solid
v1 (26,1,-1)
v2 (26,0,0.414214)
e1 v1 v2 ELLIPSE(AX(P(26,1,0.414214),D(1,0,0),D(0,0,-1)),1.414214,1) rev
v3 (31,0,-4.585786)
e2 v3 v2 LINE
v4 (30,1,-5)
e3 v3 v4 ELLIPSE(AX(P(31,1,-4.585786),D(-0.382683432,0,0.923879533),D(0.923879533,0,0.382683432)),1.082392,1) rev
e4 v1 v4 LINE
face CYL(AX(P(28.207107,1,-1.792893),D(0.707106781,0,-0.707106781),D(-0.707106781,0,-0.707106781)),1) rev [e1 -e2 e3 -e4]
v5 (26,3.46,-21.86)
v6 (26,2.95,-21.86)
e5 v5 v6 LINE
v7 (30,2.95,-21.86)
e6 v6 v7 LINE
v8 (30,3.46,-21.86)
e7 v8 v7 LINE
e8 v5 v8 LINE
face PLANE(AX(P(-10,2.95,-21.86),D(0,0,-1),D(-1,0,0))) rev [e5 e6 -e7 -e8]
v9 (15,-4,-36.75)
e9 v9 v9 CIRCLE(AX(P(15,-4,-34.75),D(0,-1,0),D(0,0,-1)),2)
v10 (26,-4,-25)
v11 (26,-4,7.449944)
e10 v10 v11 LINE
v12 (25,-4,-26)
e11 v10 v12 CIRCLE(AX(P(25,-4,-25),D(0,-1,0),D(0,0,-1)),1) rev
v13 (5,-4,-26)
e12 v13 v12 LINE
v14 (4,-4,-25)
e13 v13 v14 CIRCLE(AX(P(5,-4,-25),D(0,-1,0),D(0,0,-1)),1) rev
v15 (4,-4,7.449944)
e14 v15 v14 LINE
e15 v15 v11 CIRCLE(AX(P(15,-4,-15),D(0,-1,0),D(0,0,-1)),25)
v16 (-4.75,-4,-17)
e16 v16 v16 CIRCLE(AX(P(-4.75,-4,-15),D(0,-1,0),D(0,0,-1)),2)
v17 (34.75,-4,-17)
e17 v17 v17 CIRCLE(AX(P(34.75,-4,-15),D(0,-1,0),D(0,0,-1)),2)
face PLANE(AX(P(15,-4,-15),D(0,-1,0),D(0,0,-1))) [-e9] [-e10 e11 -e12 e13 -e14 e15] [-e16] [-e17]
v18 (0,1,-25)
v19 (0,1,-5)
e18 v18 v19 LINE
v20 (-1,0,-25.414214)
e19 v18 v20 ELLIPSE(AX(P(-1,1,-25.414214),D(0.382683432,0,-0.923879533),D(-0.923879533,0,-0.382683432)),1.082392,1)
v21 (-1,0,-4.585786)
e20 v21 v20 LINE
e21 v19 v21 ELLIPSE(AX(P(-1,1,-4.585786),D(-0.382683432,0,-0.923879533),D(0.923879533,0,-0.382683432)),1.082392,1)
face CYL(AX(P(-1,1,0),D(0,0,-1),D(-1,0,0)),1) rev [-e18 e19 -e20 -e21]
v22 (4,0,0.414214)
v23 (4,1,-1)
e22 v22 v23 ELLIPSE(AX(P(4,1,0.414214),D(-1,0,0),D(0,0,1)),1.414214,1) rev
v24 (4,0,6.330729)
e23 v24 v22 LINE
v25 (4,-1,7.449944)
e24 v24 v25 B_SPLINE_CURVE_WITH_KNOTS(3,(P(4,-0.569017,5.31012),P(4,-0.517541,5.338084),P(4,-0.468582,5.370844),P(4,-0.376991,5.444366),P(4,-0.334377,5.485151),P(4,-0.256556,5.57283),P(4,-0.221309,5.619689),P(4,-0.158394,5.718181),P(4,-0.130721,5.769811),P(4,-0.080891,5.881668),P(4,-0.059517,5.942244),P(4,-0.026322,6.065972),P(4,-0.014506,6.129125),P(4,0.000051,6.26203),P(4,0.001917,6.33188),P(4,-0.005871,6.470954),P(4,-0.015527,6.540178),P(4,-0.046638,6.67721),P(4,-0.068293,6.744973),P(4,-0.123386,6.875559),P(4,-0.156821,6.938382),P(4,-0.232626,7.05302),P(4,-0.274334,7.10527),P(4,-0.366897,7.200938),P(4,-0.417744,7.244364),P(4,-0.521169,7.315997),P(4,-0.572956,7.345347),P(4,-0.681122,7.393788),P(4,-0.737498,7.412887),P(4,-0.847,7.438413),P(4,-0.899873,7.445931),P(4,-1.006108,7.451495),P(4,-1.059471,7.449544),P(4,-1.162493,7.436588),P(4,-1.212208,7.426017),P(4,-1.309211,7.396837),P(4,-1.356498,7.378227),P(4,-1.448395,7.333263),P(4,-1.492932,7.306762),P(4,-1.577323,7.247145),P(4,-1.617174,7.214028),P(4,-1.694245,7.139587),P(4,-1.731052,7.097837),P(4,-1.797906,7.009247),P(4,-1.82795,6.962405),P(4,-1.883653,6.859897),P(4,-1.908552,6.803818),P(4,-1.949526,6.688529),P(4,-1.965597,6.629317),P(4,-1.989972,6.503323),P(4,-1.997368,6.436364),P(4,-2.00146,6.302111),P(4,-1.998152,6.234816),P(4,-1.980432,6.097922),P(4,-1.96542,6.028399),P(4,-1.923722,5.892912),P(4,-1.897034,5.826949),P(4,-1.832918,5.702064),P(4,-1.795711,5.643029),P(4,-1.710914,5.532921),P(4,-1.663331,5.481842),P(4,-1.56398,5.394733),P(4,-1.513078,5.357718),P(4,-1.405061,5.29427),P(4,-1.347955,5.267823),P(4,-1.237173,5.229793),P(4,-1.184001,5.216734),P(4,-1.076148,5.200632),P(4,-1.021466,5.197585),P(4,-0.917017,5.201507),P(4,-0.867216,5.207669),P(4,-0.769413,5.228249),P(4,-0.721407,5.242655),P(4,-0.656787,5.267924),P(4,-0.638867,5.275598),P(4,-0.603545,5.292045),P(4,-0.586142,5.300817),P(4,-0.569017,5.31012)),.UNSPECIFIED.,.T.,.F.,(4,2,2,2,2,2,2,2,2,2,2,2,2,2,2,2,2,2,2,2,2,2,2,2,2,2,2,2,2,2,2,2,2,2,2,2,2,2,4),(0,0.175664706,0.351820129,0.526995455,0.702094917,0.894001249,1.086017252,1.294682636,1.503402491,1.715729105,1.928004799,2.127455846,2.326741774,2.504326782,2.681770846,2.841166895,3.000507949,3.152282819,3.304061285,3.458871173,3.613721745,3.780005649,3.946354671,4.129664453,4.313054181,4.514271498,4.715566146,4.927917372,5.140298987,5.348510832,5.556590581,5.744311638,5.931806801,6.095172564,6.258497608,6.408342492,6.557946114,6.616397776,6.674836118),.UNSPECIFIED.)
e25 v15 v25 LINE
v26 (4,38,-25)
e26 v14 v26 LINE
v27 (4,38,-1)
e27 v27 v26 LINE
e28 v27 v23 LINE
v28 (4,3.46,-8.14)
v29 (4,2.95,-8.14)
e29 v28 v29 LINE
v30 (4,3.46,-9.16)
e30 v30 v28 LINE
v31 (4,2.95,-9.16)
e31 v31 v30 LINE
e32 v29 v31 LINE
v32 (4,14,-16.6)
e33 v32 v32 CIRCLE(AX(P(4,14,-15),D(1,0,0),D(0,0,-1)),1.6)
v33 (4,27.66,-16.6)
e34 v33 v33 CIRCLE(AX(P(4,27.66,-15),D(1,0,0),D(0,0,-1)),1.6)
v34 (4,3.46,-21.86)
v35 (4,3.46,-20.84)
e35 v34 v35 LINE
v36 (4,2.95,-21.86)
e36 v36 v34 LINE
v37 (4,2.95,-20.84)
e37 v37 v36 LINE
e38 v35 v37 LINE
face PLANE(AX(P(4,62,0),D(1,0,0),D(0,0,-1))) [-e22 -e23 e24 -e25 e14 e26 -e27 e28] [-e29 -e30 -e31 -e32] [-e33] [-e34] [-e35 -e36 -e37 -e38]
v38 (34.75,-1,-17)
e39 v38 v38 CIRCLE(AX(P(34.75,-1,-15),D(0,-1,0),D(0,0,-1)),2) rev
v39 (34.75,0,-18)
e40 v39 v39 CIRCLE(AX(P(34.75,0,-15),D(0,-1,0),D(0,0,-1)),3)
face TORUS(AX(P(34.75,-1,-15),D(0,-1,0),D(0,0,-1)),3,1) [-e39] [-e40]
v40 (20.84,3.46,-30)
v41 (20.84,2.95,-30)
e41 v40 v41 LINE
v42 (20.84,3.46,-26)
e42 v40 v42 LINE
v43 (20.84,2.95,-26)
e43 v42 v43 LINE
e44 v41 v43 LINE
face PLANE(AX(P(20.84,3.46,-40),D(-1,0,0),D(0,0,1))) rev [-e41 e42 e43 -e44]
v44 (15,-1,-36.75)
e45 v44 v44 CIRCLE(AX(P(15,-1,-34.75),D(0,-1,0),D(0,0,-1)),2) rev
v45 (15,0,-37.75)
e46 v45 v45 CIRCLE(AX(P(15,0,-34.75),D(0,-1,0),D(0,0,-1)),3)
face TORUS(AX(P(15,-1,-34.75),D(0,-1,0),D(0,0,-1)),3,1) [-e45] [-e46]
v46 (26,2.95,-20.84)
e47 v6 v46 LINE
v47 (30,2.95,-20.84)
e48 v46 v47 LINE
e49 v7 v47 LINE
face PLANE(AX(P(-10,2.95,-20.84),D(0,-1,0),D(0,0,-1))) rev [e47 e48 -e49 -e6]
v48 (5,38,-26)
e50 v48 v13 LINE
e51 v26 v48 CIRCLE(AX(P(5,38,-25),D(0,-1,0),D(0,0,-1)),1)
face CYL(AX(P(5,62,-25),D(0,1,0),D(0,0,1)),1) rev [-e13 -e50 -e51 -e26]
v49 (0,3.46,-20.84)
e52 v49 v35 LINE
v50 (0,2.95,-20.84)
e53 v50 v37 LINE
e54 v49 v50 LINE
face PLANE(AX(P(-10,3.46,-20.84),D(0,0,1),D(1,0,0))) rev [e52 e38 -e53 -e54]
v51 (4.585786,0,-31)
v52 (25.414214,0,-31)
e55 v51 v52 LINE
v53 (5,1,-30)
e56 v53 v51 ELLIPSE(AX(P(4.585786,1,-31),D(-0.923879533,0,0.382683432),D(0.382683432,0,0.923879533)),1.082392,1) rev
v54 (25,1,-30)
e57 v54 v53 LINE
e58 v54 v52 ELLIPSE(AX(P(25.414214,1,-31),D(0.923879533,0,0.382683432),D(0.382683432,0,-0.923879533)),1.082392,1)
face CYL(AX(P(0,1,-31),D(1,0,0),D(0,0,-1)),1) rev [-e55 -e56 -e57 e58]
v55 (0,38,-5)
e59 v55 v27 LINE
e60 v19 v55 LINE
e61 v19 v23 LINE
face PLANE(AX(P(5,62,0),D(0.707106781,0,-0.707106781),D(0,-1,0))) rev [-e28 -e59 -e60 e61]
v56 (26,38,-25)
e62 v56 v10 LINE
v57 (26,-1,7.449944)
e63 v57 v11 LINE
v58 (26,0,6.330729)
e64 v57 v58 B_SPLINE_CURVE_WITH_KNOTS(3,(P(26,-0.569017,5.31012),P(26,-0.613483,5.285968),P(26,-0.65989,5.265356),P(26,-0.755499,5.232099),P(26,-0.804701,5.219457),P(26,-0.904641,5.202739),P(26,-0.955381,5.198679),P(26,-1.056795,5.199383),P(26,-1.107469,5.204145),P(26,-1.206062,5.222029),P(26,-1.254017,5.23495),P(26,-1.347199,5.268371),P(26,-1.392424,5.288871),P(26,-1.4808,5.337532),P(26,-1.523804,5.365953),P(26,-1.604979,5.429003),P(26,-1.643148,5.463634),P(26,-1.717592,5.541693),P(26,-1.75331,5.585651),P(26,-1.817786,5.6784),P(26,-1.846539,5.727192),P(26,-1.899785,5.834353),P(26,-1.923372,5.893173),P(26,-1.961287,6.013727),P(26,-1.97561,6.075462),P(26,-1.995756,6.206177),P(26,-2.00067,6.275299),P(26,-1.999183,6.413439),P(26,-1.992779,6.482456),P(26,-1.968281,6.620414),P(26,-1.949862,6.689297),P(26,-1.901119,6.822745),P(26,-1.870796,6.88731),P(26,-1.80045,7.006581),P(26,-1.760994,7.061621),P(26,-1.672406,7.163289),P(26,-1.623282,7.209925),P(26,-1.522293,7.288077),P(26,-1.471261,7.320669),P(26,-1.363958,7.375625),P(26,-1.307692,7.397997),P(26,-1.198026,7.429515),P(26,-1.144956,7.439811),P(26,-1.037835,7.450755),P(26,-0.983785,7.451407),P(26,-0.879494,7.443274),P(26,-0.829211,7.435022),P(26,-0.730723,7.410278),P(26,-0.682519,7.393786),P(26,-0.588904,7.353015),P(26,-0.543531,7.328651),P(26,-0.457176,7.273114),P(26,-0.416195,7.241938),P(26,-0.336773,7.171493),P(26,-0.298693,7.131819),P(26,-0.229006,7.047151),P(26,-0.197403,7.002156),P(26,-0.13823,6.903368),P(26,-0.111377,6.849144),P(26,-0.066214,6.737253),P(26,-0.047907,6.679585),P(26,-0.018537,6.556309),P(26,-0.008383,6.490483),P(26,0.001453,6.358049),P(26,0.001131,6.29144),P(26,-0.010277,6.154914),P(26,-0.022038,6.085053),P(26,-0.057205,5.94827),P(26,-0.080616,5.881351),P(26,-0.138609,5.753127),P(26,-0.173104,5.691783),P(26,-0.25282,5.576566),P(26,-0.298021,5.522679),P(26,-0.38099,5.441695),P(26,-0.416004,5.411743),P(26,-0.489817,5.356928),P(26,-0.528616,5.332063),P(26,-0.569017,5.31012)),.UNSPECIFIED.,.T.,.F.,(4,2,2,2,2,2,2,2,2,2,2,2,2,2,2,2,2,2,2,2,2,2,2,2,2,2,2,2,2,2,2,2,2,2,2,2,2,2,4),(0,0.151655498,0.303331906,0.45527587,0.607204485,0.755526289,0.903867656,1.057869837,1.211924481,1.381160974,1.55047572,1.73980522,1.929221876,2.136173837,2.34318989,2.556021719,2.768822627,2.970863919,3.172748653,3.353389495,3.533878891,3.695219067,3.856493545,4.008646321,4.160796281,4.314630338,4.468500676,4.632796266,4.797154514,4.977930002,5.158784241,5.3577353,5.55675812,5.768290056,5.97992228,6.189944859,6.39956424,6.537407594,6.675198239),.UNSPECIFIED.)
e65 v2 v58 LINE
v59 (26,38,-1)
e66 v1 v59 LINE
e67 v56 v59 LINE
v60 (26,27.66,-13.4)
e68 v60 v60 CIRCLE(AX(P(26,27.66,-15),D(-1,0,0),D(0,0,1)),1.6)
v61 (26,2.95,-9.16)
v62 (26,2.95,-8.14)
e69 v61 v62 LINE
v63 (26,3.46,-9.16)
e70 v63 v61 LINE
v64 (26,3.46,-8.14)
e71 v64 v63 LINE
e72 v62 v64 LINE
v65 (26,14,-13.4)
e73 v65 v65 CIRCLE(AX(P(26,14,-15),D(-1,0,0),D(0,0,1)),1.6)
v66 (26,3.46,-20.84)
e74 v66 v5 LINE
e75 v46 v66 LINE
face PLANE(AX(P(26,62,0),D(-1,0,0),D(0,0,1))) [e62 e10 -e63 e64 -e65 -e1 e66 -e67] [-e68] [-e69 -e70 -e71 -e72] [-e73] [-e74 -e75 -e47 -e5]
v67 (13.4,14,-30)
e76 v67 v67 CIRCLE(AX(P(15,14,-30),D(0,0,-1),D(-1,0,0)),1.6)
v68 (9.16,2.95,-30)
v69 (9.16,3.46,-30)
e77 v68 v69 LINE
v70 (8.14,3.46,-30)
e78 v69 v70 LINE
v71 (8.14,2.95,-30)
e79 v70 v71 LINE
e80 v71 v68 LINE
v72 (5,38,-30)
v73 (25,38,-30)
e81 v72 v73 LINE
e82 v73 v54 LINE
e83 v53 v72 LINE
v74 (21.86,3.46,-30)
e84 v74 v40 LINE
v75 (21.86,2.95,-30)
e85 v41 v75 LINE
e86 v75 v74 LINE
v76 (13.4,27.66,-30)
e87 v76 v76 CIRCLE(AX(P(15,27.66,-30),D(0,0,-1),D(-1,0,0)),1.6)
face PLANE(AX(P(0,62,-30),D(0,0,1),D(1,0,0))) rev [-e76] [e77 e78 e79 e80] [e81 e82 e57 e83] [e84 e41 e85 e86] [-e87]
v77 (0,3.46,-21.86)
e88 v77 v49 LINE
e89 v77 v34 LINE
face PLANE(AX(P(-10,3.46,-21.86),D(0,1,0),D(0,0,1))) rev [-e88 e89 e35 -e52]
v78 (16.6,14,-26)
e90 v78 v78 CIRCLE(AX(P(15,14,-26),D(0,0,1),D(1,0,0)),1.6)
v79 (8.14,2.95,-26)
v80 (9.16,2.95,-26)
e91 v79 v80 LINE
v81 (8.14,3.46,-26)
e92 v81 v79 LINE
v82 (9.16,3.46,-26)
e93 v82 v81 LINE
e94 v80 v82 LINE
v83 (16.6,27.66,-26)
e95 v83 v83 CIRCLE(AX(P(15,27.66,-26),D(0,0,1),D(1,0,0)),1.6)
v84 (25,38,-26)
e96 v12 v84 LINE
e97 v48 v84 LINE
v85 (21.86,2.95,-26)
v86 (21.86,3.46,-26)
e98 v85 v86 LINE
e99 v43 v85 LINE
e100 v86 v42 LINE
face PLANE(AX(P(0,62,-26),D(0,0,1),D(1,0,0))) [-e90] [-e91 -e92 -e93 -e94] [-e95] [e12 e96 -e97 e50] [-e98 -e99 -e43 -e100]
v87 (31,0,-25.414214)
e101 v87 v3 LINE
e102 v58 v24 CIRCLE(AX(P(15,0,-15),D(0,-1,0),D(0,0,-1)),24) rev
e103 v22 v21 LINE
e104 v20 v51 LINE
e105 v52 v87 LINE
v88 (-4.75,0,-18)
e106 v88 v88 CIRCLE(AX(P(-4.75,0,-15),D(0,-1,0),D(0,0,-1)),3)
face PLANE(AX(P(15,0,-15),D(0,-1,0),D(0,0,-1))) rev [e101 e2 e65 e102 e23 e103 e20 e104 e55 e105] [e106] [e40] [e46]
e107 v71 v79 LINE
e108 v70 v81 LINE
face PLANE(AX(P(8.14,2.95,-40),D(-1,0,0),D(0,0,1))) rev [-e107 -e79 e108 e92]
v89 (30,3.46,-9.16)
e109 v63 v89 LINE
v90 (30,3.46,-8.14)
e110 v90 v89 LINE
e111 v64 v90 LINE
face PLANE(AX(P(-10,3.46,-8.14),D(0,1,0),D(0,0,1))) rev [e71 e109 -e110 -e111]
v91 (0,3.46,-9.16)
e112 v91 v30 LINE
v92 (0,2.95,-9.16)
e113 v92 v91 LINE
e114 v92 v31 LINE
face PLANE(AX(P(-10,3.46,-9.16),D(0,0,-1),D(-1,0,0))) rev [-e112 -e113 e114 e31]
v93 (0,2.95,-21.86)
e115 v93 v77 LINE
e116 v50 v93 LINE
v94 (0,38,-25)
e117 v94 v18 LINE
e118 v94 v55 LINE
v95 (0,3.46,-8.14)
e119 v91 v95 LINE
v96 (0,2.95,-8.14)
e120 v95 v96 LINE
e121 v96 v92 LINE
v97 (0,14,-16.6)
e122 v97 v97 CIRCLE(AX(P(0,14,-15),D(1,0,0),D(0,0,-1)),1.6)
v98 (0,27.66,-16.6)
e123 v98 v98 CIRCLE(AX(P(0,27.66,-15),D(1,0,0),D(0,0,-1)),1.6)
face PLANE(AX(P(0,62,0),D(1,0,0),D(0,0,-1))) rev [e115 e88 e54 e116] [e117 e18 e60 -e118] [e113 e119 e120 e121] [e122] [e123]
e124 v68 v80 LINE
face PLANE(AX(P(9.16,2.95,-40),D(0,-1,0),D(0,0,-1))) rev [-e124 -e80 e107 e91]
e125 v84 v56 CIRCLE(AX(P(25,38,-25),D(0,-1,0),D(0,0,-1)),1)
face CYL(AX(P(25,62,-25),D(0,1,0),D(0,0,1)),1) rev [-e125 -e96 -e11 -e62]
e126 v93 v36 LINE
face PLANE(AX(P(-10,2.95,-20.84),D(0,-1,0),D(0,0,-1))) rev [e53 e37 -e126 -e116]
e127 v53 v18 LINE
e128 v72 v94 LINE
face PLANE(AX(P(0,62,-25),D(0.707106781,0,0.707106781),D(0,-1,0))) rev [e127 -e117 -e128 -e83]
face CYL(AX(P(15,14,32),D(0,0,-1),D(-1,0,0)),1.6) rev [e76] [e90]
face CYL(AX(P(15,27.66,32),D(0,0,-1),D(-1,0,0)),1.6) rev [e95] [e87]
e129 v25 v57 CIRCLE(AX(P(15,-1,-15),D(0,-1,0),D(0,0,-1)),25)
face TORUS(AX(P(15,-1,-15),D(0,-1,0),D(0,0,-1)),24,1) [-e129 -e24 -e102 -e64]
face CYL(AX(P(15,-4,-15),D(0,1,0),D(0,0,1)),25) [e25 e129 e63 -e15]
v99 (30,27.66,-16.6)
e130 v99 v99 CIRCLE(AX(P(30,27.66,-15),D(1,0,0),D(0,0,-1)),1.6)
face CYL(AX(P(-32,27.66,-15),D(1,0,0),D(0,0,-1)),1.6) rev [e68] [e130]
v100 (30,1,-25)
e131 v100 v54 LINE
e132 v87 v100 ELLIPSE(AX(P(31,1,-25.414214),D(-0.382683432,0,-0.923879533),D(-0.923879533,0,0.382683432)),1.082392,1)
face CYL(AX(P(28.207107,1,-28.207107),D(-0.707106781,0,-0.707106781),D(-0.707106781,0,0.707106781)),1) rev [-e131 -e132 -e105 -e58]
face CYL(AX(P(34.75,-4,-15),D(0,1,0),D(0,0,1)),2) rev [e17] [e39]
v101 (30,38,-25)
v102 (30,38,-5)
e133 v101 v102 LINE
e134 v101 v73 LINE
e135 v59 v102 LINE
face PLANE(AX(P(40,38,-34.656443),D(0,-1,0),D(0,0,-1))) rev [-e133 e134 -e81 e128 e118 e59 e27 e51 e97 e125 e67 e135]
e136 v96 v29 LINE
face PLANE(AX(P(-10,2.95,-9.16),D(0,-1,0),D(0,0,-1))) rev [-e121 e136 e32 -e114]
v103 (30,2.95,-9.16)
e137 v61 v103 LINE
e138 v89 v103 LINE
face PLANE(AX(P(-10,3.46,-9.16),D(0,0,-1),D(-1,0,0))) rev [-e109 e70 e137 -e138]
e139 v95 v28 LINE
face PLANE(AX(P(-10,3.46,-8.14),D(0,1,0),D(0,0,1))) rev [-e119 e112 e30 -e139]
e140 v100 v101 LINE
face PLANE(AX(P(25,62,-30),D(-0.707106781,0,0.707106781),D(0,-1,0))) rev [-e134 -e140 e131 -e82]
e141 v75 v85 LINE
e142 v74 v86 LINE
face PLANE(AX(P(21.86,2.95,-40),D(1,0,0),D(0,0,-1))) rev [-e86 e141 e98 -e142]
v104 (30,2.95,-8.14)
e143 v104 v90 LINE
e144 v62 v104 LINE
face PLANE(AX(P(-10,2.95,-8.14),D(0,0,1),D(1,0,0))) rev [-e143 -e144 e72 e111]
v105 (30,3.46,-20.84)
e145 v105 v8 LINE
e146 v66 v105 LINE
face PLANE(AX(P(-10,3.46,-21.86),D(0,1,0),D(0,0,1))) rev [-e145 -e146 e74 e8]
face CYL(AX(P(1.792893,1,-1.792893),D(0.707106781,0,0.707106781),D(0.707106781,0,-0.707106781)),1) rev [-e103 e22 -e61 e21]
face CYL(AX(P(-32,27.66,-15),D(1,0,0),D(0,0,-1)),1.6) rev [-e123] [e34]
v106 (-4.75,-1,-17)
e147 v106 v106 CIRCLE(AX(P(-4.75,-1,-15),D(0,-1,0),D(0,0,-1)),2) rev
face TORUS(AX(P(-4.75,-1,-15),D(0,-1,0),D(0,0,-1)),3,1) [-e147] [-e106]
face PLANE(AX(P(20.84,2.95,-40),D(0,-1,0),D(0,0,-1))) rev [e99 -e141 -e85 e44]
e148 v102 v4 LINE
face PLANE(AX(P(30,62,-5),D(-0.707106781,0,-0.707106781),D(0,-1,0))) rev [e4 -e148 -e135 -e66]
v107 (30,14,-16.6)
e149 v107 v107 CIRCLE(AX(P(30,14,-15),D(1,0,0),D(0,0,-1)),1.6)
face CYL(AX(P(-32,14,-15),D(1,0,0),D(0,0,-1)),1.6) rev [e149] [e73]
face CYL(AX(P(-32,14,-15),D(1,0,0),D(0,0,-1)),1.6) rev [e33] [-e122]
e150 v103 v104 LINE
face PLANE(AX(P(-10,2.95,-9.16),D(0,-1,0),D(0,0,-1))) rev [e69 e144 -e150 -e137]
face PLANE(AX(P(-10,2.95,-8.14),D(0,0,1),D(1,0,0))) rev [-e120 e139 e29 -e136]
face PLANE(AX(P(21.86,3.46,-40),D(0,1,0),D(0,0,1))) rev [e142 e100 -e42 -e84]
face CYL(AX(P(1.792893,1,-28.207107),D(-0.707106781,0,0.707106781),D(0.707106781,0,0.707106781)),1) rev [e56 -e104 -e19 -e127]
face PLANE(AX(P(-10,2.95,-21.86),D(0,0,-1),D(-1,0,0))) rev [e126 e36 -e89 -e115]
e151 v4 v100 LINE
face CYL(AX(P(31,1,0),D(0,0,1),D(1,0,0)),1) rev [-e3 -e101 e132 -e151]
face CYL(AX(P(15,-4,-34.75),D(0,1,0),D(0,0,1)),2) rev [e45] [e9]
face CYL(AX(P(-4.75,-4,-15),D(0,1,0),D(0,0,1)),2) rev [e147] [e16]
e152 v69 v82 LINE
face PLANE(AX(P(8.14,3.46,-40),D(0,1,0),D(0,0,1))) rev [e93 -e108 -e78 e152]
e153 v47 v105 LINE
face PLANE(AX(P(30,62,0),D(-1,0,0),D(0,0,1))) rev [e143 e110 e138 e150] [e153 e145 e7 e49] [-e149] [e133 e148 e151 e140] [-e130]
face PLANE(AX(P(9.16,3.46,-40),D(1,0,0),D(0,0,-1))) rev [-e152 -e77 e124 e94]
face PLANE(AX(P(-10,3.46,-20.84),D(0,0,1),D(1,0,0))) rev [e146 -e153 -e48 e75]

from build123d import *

# Parameters (mm, degrees)
SKETCH1_W               = 30
SKETCH1_H               = 30
BOSS_EXTRUDE1_DEPTH     = 62
SHELL1_T                = -4
SKETCH2_R               = 1.6
CUT_EXTRUDE1_DEPTH      = 62
SKETCH3_R               = 25
SKETCH3_R_2             = 2
SKETCH3_W               = 22
SKETCH3_H               = 22
BOSS_EXTRUDE2_DEPTH     = 4
CIRPATTERN1_COUNT       = 2
CIRPATTERN1_ANGLE       = 90
CHAMFER1_SIZE           = 5
FILLET1_R               = 1
FILLET2_R               = 1
SKETCH4_W               = 1.02
SKETCH4_H               = 0.51
CUT_EXTRUDE2_DEPTH      = 83.097503007
CIRPATTERN2_COUNT       = 2
CIRPATTERN2_ANGLE       = 90
SKETCH5_W               = 22
SKETCH5_H               = 14.914082391
CUT_EXTRUDE3_DEPTH      = 87.925255248
CUT_EXTRUDE4_DEPTH      = 84.928541203
CUT_EXTRUDE4_DEPTH_BACK = 84.928541203
SKETCH6_W               = 20
SKETCH6_H               = 15
SKETCH7_W               = 20
SKETCH7_H               = 15
CUT_EXTRUDE5_DEPTH      = 83.743569886
FILLET4_R               = 1
SKETCH8_W               = 39.694573315
SKETCH8_H               = 24
CUT_EXTRUDE6_DEPTH      = 84.928541203
FILLET5_R               = 1


with BuildPart() as part:
    # Sketch1 → Boss-Extrude1 (new body)
    with BuildSketch(Plane(origin=(0, 0, 0), x_dir=(1, 0, 0), z_dir=(0, 1, 0))):
        with Locations((15, 15)):
            Rectangle(SKETCH1_W, SKETCH1_H)
    extrude(amount=BOSS_EXTRUDE1_DEPTH)

    # Shell1
    shell1_openings = [part.faces().sort_by_distance(p)[0] for p in [
        (15, 62, -15),
        (15, 0, -15),
    ]]
    offset(amount=SHELL1_T, openings=shell1_openings, kind=Kind.INTERSECTION)

    # Sketch2 → Cut-Extrude1 (cut)
    with BuildSketch(Plane(origin=(30, 0, 0), x_dir=(0, 0, -1), z_dir=(1, 0, 0))):
        with Locations((15, 14)):
            Circle(SKETCH2_R)
        with Locations((15, 27.66)):
            Circle(SKETCH2_R)
    cut_extrude1 = extrude(amount=-CUT_EXTRUDE1_DEPTH, mode=Mode.SUBTRACT)

    # Sketch3 → Boss-Extrude2 (add)
    with BuildSketch(Plane.XZ):
        with Locations(Location((15, -15, 0), (0, 0, 270))):
            Circle(SKETCH3_R)
        with Locations(Location((34.75, -15, 0), (0, 0, 270))):
            Circle(SKETCH3_R_2, mode=Mode.SUBTRACT)
        with Locations(Location((15, -34.75, 0), (0, 0, 270))):
            Circle(SKETCH3_R_2, mode=Mode.SUBTRACT)
        with Locations(Location((-4.75, -15, 0), (0, 0, 270))):
            Circle(SKETCH3_R_2, mode=Mode.SUBTRACT)
        with Locations(Location((15, 4.75, 0), (0, 0, 270))):
            Circle(SKETCH3_R_2, mode=Mode.SUBTRACT)
        with Locations((15, -15)):
            Rectangle(SKETCH3_W, SKETCH3_H, mode=Mode.SUBTRACT)
    extrude(amount=BOSS_EXTRUDE2_DEPTH)

    # CirPattern1: Cut-Extrude1 ×2 about axis
    cirpattern1_axis = Axis((15, -4, -15), (0, 1, 0))
    for i in range(1, CIRPATTERN1_COUNT):
        add(cut_extrude1.rotate(cirpattern1_axis, i * CIRPATTERN1_ANGLE / (CIRPATTERN1_COUNT - 1)), mode=Mode.SUBTRACT)

    # Chamfer1
    chamfer1_edges = [part.edges().sort_by_distance(p)[0] for p in [
        (0, 31, -30),
        (30, 31, -30),
        (30, 31, 0),
        (0, 31, 0),
    ]]
    chamfer(chamfer1_edges, length=CHAMFER1_SIZE)

    # Fillet1
    # the kernel refuses this fillet: 1 mm, written as the material it takes off along each edge
    with BuildSketch(Plane(origin=(4, 62, -4), x_dir=(-1, 0, 0), z_dir=(0, 0, -1)), Plane(origin=(26, 62, -4), x_dir=(0, 0, 1), z_dir=(-1, 0, 0)), Plane(origin=(26, 62, -26), x_dir=(1, 0, 0), z_dir=(0, 0, 1)), Plane(origin=(4, 62, -26), x_dir=(0, 0, -1), z_dir=(1, 0, 0))) as fillet1_piece_1:
        with BuildLine():
            CenterArc((FILLET1_R, -FILLET1_R), FILLET1_R, 90, 90)
            Line((0, -FILLET1_R), (0, 0))
            Line((0, 0), (FILLET1_R, 0))
        make_face()
    extrude(amount=22, mode=Mode.SUBTRACT)
    with BuildSketch(Plane(origin=(2.5, 62, 0), x_dir=(0, -1, 0), z_dir=(1, 0, 0))) as fillet1_piece_2:
        with BuildLine():
            CenterArc((FILLET1_R, FILLET1_R), FILLET1_R, 180, 90)
            Line((0, FILLET1_R), (0, 0))
            Line((0, 0), (FILLET1_R, 0))
        make_face()
    extrude(amount=25, mode=Mode.SUBTRACT)
    with BuildSketch(Plane(origin=(0, 62, -27.5), x_dir=(1, 0, 0), z_dir=(0, 0, 1)), Plane(origin=(30, 62, -2.5), x_dir=(-1, 0, 0), z_dir=(0, 0, -1)), Plane(origin=(27.5, 62, -30), x_dir=(0, 0, 1), z_dir=(-1, 0, 0))) as fillet1_piece_3:
        with BuildLine():
            CenterArc((FILLET1_R, -FILLET1_R), FILLET1_R, 90, 90)
            Line((0, -FILLET1_R), (0, 0))
            Line((0, 0), (FILLET1_R, 0))
        make_face()
    extrude(amount=25, mode=Mode.SUBTRACT)
    with BuildSketch(Plane(origin=(-1.767766953, 62, -23.232233047), x_dir=(0.7071067811865476, 0, 0.7071067811865476), z_dir=(0.7071067811865476, 0, -0.7071067811865476)), Plane(origin=(23.232233047, 62, 1.767766953), x_dir=(0, -1, 0), z_dir=(0.7071067811865476, 0, -0.7071067811865476))) as fillet1_piece_4:
        with BuildLine():
            CenterArc((FILLET1_R, FILLET1_R), FILLET1_R, 180, 90)
            Line((0, FILLET1_R), (0, 0))
            Line((0, 0), (FILLET1_R, 0))
        make_face()
    extrude(amount=12.071067812, mode=Mode.SUBTRACT)
    with BuildSketch(Plane(origin=(31.767766953, 62, -23.232233047), x_dir=(-0.7071067811865476, 0, 0.7071067811865476), z_dir=(-0.7071067811865476, 0, -0.7071067811865476)), Plane(origin=(6.767766953, 62, 1.767766953), x_dir=(0, -1, 0), z_dir=(-0.7071067811865476, 0, -0.7071067811865476))) as fillet1_piece_5:
        with BuildLine():
            CenterArc((FILLET1_R, -FILLET1_R), FILLET1_R, 90, 90)
            Line((0, -FILLET1_R), (0, 0))
            Line((0, 0), (FILLET1_R, 0))
        make_face()
    extrude(amount=12.071067812, mode=Mode.SUBTRACT)
    with BuildSketch(Plane(origin=(26, 62, -4), x_dir=(0, 0, 1), z_dir=(-1, 0, 0))) as fillet1_piece_6a_section:
        with BuildLine():
            CenterArc((FILLET1_R, -FILLET1_R), FILLET1_R, 90, 90)
            Line((0, -FILLET1_R), (0, 0))
            Line((0, 0), (FILLET1_R, 0))
        make_face()
    fillet1_piece_6a = extrude(amount=24.5, mode=Mode.PRIVATE)
    fillet1_piece_6a = split(fillet1_piece_6a, bisect_by=Plane(origin=(4, 61.773604886, -3.773604886), z_dir=(-1, 0, 0)), keep=Keep.TOP, mode=Mode.PRIVATE)
    with BuildSketch(Plane(origin=(4, 62, -1.5), x_dir=(-1, 0, 0), z_dir=(0, 0, -1))) as fillet1_piece_6b_section:
        with BuildLine():
            CenterArc((FILLET1_R, -FILLET1_R), FILLET1_R, 90, 90)
            Line((0, -FILLET1_R), (0, 0))
            Line((0, 0), (FILLET1_R, 0))
        make_face()
    fillet1_piece_6b = extrude(amount=24.5, mode=Mode.PRIVATE)
    fillet1_piece_6b = split(fillet1_piece_6b, bisect_by=Plane(origin=(3.773604886, 61.773604886, -4), z_dir=(0, 0, 1)), keep=Keep.TOP, mode=Mode.PRIVATE)
    fillet1_piece_6 = fillet1_piece_6a & fillet1_piece_6b
    add(fillet1_piece_6, mode=Mode.SUBTRACT)
    with BuildSketch(Plane(origin=(4, 62, -4), x_dir=(-1, 0, 0), z_dir=(0, 0, -1))) as fillet1_piece_7a_section:
        with BuildLine():
            CenterArc((FILLET1_R, -FILLET1_R), FILLET1_R, 90, 90)
            Line((0, -FILLET1_R), (0, 0))
            Line((0, 0), (FILLET1_R, 0))
        make_face()
    fillet1_piece_7a = extrude(amount=24.5, mode=Mode.PRIVATE)
    fillet1_piece_7a = split(fillet1_piece_7a, bisect_by=Plane(origin=(3.773604886, 61.773604886, -26), z_dir=(0, 0, -1)), keep=Keep.TOP, mode=Mode.PRIVATE)
    with BuildSketch(Plane(origin=(1.5, 62, -26), x_dir=(0, 0, -1), z_dir=(1, 0, 0))) as fillet1_piece_7b_section:
        with BuildLine():
            CenterArc((FILLET1_R, -FILLET1_R), FILLET1_R, 90, 90)
            Line((0, -FILLET1_R), (0, 0))
            Line((0, 0), (FILLET1_R, 0))
        make_face()
    fillet1_piece_7b = extrude(amount=24.5, mode=Mode.PRIVATE)
    fillet1_piece_7b = split(fillet1_piece_7b, bisect_by=Plane(origin=(4, 61.773604886, -26.226395114), z_dir=(-1, 0, 0)), keep=Keep.TOP, mode=Mode.PRIVATE)
    fillet1_piece_7 = fillet1_piece_7a & fillet1_piece_7b
    add(fillet1_piece_7, mode=Mode.SUBTRACT)
    with BuildSketch(Plane(origin=(28.5, 62, -4), x_dir=(0, 0, 1), z_dir=(-1, 0, 0))) as fillet1_piece_8a_section:
        with BuildLine():
            CenterArc((FILLET1_R, -FILLET1_R), FILLET1_R, 90, 90)
            Line((0, -FILLET1_R), (0, 0))
            Line((0, 0), (FILLET1_R, 0))
        make_face()
    fillet1_piece_8a = extrude(amount=24.5, mode=Mode.PRIVATE)
    fillet1_piece_8a = split(fillet1_piece_8a, bisect_by=Plane(origin=(26, 61.773604886, -3.773604886), z_dir=(1, 0, 0)), keep=Keep.TOP, mode=Mode.PRIVATE)
    with BuildSketch(Plane(origin=(26, 62, -26), x_dir=(1, 0, 0), z_dir=(0, 0, 1))) as fillet1_piece_8b_section:
        with BuildLine():
            CenterArc((FILLET1_R, -FILLET1_R), FILLET1_R, 90, 90)
            Line((0, -FILLET1_R), (0, 0))
            Line((0, 0), (FILLET1_R, 0))
        make_face()
    fillet1_piece_8b = extrude(amount=24.5, mode=Mode.PRIVATE)
    fillet1_piece_8b = split(fillet1_piece_8b, bisect_by=Plane(origin=(26.226395114, 61.773604886, -4), z_dir=(0, 0, 1)), keep=Keep.TOP, mode=Mode.PRIVATE)
    fillet1_piece_8 = fillet1_piece_8a & fillet1_piece_8b
    add(fillet1_piece_8, mode=Mode.SUBTRACT)
    with BuildSketch(Plane(origin=(4, 62, -26), x_dir=(0, 0, -1), z_dir=(1, 0, 0))) as fillet1_piece_9a_section:
        with BuildLine():
            CenterArc((FILLET1_R, -FILLET1_R), FILLET1_R, 90, 90)
            Line((0, -FILLET1_R), (0, 0))
            Line((0, 0), (FILLET1_R, 0))
        make_face()
    fillet1_piece_9a = extrude(amount=24.5, mode=Mode.PRIVATE)
    fillet1_piece_9a = split(fillet1_piece_9a, bisect_by=Plane(origin=(26, 61.773604886, -26.226395114), z_dir=(1, 0, 0)), keep=Keep.TOP, mode=Mode.PRIVATE)
    with BuildSketch(Plane(origin=(26, 62, -28.5), x_dir=(1, 0, 0), z_dir=(0, 0, 1))) as fillet1_piece_9b_section:
        with BuildLine():
            CenterArc((FILLET1_R, -FILLET1_R), FILLET1_R, 90, 90)
            Line((0, -FILLET1_R), (0, 0))
            Line((0, 0), (FILLET1_R, 0))
        make_face()
    fillet1_piece_9b = extrude(amount=24.5, mode=Mode.PRIVATE)
    fillet1_piece_9b = split(fillet1_piece_9b, bisect_by=Plane(origin=(26.226395114, 61.773604886, -26), z_dir=(0, 0, -1)), keep=Keep.TOP, mode=Mode.PRIVATE)
    fillet1_piece_9 = fillet1_piece_9a & fillet1_piece_9b
    add(fillet1_piece_9, mode=Mode.SUBTRACT)

    # Fillet2
    fillet2_edges = [part.edges().sort_by_distance(p)[0] for p in [
        (34.75, 0, -13),
        (15, 0, -32.75),
        (-4.75, 0, -13),
        (15, 0, 6.75),
        (15, 0, 10),
        (15, 0, 0),
        (0, 0, -15),
        (30, 0, -15),
        (15, 0, -30),
        (2.5, 0, -2.5),
        (27.5, 0, -2.5),
        (27.5, 0, -27.5),
        (2.5, 0, -27.5),
    ]]
    fillet(fillet2_edges, radius=FILLET2_R)

    # Sketch4 → Cut-Extrude2 (cut, symmetric)
    with BuildSketch(Plane(origin=(4, 0, 0), x_dir=(0, 0, -1), z_dir=(1, 0, 0))):
        with Locations((8.65, 3.205)):
            Rectangle(SKETCH4_W, SKETCH4_H)
        with Locations((21.35, 3.205)):
            Rectangle(SKETCH4_W, SKETCH4_H)
    cut_extrude2 = extrude(amount=CUT_EXTRUDE2_DEPTH, both=True, mode=Mode.SUBTRACT)

    # CirPattern2: Cut-Extrude2 ×2 about axis
    cirpattern2_axis = Axis((15, -4, -15), (0, -1, 0))
    for i in range(1, CIRPATTERN2_COUNT):
        add(cut_extrude2.rotate(cirpattern2_axis, i * CIRPATTERN2_ANGLE / (CIRPATTERN2_COUNT - 1)), mode=Mode.SUBTRACT)

    # Sketch5 → Cut-Extrude3 (cut, through all)
    with BuildSketch(Plane(origin=(0, 62, 0), x_dir=(1, 0, 0), z_dir=(0, 1, 0))):
        with Locations((15, -3.457041196)):
            Rectangle(SKETCH5_W, SKETCH5_H)
    extrude(amount=-CUT_EXTRUDE3_DEPTH, mode=Mode.SUBTRACT)

    # Sketch6 → Cut-Extrude4 (cut, two sides: drawn at the far end of the back side and taken through both)
    with BuildSketch(Plane.ZY.offset(-CUT_EXTRUDE4_DEPTH_BACK)):
        with Locations((-15, 50.5)):
            Rectangle(SKETCH6_W, SKETCH6_H)
    extrude(amount=CUT_EXTRUDE4_DEPTH + CUT_EXTRUDE4_DEPTH_BACK, mode=Mode.SUBTRACT)

    # Sketch7 → Cut-Extrude5 (cut, through all)
    with BuildSketch(Plane(origin=(0, 0, -30), x_dir=(-1, 0, 0), z_dir=(0, 0, -1))):
        with Locations((-15, 50.5)):
            Rectangle(SKETCH7_W, SKETCH7_H)
    extrude(amount=-CUT_EXTRUDE5_DEPTH, mode=Mode.SUBTRACT)

    # Fillet4
    fillet4_edges = [part.edges().sort_by_distance(p)[0] for p in [
        (2, 58, -25),
        (28, 58, -25),
        (2, 43, -5),
        (28, 43, -5),
        (2, 58, -5),
        (2, 43, -25),
        (28, 43, -25),
        (28, 58, -5),
        (25, 43, -28),
        (25, 58, -28),
        (5, 58, -28),
        (5, 43, -28),
    ]]
    fillet(fillet4_edges, radius=FILLET4_R)

    # Sketch8 → Cut-Extrude6 (cut, through all)
    with BuildSketch(Plane.ZY):
        with Locations((-14.809156122, 50)):
            Rectangle(SKETCH8_W, SKETCH8_H)
    extrude(amount=-CUT_EXTRUDE6_DEPTH, mode=Mode.SUBTRACT)

    # Fillet5
    fillet5_edges = [part.edges().sort_by_distance(p)[0] for p in [
        (26, 17, -26),
        (4, 17, -26),
    ]]
    fillet(fillet5_edges, radius=FILLET5_R)


solid = part.part
